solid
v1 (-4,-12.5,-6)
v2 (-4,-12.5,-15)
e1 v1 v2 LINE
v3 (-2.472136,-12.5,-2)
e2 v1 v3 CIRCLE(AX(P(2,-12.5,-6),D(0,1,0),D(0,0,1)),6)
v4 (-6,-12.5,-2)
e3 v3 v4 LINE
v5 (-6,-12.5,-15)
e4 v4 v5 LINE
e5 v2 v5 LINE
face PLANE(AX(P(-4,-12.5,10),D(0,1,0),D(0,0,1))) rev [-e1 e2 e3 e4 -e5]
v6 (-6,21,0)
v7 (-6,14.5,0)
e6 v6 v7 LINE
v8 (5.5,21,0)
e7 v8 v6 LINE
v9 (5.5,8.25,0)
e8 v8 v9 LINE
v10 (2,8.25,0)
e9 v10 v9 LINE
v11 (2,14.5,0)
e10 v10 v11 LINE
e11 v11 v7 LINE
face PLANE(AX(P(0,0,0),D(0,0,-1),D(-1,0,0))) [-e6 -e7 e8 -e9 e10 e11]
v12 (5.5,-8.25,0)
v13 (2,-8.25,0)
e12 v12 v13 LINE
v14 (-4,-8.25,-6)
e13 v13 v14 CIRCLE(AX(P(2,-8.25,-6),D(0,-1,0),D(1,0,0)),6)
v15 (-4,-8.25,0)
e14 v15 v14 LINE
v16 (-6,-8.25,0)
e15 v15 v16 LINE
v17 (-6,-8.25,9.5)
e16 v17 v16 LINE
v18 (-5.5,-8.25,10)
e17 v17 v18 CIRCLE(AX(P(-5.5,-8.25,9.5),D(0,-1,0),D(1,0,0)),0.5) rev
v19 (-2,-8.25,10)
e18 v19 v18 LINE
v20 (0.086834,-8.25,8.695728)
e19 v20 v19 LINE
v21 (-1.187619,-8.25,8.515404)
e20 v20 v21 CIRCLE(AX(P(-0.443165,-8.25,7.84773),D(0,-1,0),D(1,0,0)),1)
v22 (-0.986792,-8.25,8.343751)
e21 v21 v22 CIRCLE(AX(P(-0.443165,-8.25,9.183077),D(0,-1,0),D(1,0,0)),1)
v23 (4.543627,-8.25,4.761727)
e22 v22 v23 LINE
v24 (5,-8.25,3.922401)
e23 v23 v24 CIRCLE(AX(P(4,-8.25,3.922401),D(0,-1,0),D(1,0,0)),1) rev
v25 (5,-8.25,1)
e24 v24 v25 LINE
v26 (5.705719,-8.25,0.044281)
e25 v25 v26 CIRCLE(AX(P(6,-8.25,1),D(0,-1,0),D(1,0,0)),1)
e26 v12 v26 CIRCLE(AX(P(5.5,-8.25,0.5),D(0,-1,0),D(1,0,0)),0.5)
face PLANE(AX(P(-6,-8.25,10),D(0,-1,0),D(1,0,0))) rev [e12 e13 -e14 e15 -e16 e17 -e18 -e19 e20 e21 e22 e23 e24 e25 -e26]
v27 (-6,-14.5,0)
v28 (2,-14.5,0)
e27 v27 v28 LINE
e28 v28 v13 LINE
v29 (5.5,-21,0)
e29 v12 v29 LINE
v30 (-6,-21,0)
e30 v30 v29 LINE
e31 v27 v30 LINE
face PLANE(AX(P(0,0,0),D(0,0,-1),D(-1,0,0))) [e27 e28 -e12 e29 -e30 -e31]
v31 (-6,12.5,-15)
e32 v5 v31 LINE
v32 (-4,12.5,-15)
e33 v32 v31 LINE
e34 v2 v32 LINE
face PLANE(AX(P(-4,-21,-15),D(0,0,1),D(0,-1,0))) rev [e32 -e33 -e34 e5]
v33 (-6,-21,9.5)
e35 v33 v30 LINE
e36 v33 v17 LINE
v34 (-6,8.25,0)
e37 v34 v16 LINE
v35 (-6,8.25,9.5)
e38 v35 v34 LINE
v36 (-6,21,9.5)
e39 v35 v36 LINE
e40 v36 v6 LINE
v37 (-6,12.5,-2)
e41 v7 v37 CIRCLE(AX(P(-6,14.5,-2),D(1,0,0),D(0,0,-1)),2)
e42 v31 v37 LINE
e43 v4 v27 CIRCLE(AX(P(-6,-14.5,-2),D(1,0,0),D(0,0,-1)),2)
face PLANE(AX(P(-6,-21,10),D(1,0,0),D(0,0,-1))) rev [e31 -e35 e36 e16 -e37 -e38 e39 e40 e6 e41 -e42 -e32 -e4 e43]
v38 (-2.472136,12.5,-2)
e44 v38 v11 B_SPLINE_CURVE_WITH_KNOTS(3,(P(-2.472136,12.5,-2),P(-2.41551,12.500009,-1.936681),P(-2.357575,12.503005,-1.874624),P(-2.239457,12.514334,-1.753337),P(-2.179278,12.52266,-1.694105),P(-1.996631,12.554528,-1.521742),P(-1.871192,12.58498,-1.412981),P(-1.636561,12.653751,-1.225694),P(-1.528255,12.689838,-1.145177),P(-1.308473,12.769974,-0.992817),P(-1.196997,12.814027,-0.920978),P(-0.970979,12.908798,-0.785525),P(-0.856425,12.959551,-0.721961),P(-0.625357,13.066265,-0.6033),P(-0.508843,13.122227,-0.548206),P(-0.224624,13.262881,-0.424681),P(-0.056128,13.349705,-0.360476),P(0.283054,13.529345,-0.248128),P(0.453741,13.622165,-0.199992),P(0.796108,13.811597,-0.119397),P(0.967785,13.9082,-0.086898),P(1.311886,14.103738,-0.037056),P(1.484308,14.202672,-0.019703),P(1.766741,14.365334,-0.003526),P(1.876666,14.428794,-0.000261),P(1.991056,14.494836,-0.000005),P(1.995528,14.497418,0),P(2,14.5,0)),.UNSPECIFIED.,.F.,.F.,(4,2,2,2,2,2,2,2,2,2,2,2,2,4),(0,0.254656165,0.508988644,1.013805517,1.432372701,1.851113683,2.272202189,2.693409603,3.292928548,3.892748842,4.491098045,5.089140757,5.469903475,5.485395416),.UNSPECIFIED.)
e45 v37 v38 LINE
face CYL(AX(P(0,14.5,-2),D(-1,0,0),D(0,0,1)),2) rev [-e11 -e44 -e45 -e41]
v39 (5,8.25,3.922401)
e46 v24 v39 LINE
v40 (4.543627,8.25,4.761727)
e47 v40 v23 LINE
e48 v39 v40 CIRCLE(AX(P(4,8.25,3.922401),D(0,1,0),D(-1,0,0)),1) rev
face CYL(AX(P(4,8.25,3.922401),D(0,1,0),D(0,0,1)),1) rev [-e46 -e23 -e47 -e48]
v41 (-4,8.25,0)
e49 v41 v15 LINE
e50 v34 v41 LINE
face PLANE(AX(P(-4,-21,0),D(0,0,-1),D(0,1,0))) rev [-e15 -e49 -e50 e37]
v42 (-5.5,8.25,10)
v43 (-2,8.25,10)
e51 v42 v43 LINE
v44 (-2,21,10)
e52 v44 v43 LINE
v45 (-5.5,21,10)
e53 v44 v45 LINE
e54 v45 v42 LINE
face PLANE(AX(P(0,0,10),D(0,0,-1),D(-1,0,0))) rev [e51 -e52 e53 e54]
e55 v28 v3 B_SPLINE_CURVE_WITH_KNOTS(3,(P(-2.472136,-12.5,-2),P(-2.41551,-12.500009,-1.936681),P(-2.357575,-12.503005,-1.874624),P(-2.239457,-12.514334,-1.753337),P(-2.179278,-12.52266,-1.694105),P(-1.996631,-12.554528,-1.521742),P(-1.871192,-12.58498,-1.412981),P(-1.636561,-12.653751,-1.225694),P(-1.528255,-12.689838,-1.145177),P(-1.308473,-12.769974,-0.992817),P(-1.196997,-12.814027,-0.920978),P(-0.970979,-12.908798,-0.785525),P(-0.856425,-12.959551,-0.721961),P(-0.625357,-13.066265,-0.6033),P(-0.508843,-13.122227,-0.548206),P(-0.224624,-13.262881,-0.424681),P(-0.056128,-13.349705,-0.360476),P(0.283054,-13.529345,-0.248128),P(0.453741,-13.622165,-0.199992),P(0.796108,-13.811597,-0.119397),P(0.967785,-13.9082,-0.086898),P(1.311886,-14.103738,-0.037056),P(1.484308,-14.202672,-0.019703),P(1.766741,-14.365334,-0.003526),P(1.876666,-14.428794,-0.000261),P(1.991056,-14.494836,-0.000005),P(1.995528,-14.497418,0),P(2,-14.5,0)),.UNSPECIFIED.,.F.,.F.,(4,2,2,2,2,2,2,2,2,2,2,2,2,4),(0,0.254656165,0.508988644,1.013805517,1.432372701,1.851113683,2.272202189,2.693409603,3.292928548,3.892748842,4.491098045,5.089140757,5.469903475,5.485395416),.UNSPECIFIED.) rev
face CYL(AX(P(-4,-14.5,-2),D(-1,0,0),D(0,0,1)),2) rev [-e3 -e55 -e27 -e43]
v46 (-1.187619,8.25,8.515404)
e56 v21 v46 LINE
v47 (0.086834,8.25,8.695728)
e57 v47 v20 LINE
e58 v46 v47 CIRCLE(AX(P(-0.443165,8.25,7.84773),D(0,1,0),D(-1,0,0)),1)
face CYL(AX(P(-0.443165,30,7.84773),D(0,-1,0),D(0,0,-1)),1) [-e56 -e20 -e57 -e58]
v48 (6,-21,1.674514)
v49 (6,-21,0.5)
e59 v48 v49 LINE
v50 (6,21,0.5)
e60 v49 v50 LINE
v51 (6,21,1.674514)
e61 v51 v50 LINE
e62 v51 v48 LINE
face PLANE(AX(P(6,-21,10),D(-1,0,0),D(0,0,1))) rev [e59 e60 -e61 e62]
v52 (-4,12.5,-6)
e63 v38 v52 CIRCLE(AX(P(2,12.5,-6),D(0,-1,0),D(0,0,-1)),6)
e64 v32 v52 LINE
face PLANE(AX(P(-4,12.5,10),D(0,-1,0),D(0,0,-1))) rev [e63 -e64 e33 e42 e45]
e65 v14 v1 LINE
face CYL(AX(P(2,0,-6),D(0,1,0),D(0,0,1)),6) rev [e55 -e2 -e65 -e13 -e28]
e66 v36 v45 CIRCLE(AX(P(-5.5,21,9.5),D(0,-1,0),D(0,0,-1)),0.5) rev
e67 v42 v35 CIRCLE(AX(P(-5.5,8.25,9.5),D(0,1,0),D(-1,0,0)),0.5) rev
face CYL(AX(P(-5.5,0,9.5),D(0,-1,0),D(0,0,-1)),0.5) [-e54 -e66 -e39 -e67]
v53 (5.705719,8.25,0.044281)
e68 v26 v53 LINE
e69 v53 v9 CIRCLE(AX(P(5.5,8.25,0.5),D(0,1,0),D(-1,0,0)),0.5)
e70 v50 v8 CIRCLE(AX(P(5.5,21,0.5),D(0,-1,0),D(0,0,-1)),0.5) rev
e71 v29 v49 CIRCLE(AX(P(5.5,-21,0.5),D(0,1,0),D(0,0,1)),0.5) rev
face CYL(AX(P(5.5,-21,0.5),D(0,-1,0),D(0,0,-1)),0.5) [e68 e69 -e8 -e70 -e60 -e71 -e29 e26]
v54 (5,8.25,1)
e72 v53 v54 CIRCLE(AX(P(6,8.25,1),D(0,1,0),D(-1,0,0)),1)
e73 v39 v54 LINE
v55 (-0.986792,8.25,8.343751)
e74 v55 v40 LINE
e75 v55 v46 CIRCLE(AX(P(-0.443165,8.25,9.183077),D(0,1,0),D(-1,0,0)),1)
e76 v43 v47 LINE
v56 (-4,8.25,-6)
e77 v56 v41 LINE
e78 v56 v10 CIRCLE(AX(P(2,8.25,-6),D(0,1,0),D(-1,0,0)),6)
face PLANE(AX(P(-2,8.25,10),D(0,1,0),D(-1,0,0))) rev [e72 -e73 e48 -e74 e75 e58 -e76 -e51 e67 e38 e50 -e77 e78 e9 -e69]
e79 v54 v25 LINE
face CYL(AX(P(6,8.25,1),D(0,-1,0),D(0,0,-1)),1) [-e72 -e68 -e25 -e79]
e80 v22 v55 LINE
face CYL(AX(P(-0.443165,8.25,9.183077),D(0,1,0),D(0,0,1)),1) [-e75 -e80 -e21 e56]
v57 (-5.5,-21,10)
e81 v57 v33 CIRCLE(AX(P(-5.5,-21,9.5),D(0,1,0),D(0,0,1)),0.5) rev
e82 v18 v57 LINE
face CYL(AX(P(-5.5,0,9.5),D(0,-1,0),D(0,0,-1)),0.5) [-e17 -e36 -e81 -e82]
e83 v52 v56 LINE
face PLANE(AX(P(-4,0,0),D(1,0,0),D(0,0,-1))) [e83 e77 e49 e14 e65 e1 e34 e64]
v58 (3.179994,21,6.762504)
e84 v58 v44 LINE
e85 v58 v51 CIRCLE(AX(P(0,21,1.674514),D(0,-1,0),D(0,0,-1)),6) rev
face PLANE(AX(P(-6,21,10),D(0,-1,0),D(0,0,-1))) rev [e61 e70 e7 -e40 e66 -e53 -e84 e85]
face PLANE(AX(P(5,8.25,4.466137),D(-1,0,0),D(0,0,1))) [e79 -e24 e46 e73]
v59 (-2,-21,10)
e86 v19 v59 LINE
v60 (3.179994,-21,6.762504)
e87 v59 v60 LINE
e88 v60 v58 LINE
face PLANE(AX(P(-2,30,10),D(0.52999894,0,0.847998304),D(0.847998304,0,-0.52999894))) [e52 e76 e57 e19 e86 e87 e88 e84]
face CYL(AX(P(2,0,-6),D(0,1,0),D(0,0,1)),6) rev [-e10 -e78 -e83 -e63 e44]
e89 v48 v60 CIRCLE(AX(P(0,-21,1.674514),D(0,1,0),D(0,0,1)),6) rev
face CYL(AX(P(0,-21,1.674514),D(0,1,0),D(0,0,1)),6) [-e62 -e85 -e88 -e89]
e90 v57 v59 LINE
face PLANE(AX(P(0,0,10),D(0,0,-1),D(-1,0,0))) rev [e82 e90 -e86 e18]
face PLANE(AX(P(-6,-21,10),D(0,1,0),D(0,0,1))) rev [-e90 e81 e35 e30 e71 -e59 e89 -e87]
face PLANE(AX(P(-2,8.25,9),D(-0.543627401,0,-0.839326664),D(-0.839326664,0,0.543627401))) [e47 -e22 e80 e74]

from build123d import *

# Parameters (mm, degrees)
BOSS_EXTRUDE1_DEPTH     = 10
CUT_EXTRUDE1_DEPTH      = 30
CUT_EXTRUDE1_DEPTH_BACK = 30
CUT_EXTRUDE4_DEPTH      = 8.25
CUT_EXTRUDE4_DEPTH_BACK = 8.25
FILLET3_R               = 0.5
BOSS_EXTRUDE2_START     = -6
SKETCH4_W               = 15
SKETCH4_H               = 25
BOSS_EXTRUDE2_DEPTH     = 2
FILLET5_R               = 6
FILLET10_R              = 2
FILLET19_R              = 6
SKETCH9_W               = 1.113670972
SKETCH9_H               = 16.5
CUT_EXTRUDE5_DEPTH      = 10
FILLET21_R              = 1


with BuildPart() as part:
    # Sketch1 → Boss-Extrude1 (new body)
    with BuildSketch(Plane.XY):
        Polygon((-6, -21), (6, -21), (6, 21), (-6, 21), (-6, 8.25), (-2, 8.25), (-2, -8.25), (-6, -8.25), align=None)
    extrude(amount=BOSS_EXTRUDE1_DEPTH)

    # Sketch2 → Cut-Extrude1 (cut, two sides: drawn at the far end of the back side and taken through both)
    with BuildSketch(Plane(origin=(0, 0, 0), x_dir=(1, 0, 0), z_dir=(0, 1, 0)).offset(-CUT_EXTRUDE1_DEPTH_BACK)):
        Polygon((-2, -10), (6, -5), (6, -10), align=None)
    extrude(amount=CUT_EXTRUDE1_DEPTH + CUT_EXTRUDE1_DEPTH_BACK, mode=Mode.SUBTRACT)

    # Sketch8 → Cut-Extrude4 (cut, two sides: drawn at the far end of the back side and taken through both)
    with BuildSketch(Plane(origin=(0, 0, 0), x_dir=(1, 0, 0), z_dir=(0, 1, 0)).offset(-CUT_EXTRUDE4_DEPTH_BACK)):
        Polygon((-2, 0), (-2, -9), (5, -4.466137359), (5, 0), align=None)
    extrude(amount=CUT_EXTRUDE4_DEPTH + CUT_EXTRUDE4_DEPTH_BACK, mode=Mode.SUBTRACT)

    # Fillet3
    fillet3_edges = [part.edges().sort_by_distance(p)[0] for p in [
        (-6, 14.625, 10),
        (6, 0, 0),
        (-6, -14.625, 10),
    ]]
    fillet(fillet3_edges, radius=FILLET3_R)

    # Sketch4 → Boss-Extrude2 (add)
    with BuildSketch(Plane(origin=(0, 0, 0), x_dir=(0, 0, -1), z_dir=(1, 0, 0)).offset(BOSS_EXTRUDE2_START)):
        with Locations((7.5, 0)):
            Rectangle(SKETCH4_W, SKETCH4_H)
    extrude(amount=BOSS_EXTRUDE2_DEPTH)

    # Fillet5
    fillet5_edges = [part.edges().sort_by_distance(p)[0] for p in [
        (-4, -10.375, 0),
        (-4, 10.375, 0),
    ]]
    fillet(fillet5_edges, radius=FILLET5_R)

    # Fillet10
    fillet10_edges = [part.edges().sort_by_distance(p)[0] for p in [
        (-2, 12.5, 0),
        (-2, -12.5, 0),
    ]]
    fillet(fillet10_edges, radius=FILLET10_R)

    # Fillet19
    fillet19_edges = [part.edges().sort_by_distance(p)[0] for p in [
        (6, 0, 5),
    ]]
    fillet(fillet19_edges, radius=FILLET19_R)

    # Sketch9 → Cut-Extrude5 (cut)
    with BuildSketch(Plane.XY):
        with Locations((-2, 0)):
            Rectangle(SKETCH9_W, SKETCH9_H)
    extrude(amount=CUT_EXTRUDE5_DEPTH, mode=Mode.SUBTRACT)

    # Fillet21
    # the kernel refuses this fillet: 1 mm, written as the material it adds along each edge
    with BuildSketch(Plane(origin=(5, -9.609341418, 4.466137359), x_dir=(0, 0, -1), z_dir=(0, 1, 0))) as fillet21_piece_1:
        with BuildLine():
            CenterArc((FILLET21_R * 0.543736567297, FILLET21_R), FILLET21_R, 212.930914829, 57.069085171)
            Line((-FILLET21_R * 0.295590096809, FILLET21_R * 0.456372599182), (0, 0))
            Line((0, 0), (FILLET21_R * 0.543736567297, 0))
        make_face()
    extrude(amount=19.218682836)
    # the kernel refuses this fillet: 1 mm, written as the material it takes off along each edge
    with BuildSketch(Plane(origin=(5, 8.25, 0), x_dir=(1, 0, 0), z_dir=(0, -1, 0))) as fillet21_2_piece_1:
        with BuildLine():
            CenterArc((FILLET21_R, FILLET21_R), FILLET21_R, 180, 90)
            Line((0, FILLET21_R), (0, 0))
            Line((0, 0), (FILLET21_R, 0))
        make_face()
    extrude(amount=16.5, mode=Mode.SUBTRACT)
    with BuildSketch(Plane(origin=(-1.443164514, -8.25, 8.639340628), x_dir=(0, 0, 1), z_dir=(0, 1, 0))) as fillet21_2_piece_2:
        with BuildLine():
            CenterArc((FILLET21_R * 0.543736567297, FILLET21_R), FILLET21_R, 212.930914829, 57.069085171)
            Line((-FILLET21_R * 0.295590096809, FILLET21_R * 0.456372599182), (0, 0))
            Line((0, 0), (FILLET21_R * 0.543736567297, 0))
        make_face()
    extrude(amount=16.5, mode=Mode.SUBTRACT)
    with BuildSketch(Plane(origin=(-1.443164514, -8.25, 9.651977821), x_dir=(0.8479983040050877, 0, -0.5299989400031806), z_dir=(0, 1, 0))) as fillet21_2_piece_3:
        with BuildLine():
            CenterArc((FILLET21_R * 1.80424764151, FILLET21_R), FILLET21_R, 147.994616792, 122.005383208)
            Line((FILLET21_R * 0.956249337502, FILLET21_R * 1.52999894), (0, 0))
            Line((0, 0), (FILLET21_R * 1.80424764151, 0))
        make_face()
    extrude(amount=16.5, mode=Mode.SUBTRACT)


solid = part.part
